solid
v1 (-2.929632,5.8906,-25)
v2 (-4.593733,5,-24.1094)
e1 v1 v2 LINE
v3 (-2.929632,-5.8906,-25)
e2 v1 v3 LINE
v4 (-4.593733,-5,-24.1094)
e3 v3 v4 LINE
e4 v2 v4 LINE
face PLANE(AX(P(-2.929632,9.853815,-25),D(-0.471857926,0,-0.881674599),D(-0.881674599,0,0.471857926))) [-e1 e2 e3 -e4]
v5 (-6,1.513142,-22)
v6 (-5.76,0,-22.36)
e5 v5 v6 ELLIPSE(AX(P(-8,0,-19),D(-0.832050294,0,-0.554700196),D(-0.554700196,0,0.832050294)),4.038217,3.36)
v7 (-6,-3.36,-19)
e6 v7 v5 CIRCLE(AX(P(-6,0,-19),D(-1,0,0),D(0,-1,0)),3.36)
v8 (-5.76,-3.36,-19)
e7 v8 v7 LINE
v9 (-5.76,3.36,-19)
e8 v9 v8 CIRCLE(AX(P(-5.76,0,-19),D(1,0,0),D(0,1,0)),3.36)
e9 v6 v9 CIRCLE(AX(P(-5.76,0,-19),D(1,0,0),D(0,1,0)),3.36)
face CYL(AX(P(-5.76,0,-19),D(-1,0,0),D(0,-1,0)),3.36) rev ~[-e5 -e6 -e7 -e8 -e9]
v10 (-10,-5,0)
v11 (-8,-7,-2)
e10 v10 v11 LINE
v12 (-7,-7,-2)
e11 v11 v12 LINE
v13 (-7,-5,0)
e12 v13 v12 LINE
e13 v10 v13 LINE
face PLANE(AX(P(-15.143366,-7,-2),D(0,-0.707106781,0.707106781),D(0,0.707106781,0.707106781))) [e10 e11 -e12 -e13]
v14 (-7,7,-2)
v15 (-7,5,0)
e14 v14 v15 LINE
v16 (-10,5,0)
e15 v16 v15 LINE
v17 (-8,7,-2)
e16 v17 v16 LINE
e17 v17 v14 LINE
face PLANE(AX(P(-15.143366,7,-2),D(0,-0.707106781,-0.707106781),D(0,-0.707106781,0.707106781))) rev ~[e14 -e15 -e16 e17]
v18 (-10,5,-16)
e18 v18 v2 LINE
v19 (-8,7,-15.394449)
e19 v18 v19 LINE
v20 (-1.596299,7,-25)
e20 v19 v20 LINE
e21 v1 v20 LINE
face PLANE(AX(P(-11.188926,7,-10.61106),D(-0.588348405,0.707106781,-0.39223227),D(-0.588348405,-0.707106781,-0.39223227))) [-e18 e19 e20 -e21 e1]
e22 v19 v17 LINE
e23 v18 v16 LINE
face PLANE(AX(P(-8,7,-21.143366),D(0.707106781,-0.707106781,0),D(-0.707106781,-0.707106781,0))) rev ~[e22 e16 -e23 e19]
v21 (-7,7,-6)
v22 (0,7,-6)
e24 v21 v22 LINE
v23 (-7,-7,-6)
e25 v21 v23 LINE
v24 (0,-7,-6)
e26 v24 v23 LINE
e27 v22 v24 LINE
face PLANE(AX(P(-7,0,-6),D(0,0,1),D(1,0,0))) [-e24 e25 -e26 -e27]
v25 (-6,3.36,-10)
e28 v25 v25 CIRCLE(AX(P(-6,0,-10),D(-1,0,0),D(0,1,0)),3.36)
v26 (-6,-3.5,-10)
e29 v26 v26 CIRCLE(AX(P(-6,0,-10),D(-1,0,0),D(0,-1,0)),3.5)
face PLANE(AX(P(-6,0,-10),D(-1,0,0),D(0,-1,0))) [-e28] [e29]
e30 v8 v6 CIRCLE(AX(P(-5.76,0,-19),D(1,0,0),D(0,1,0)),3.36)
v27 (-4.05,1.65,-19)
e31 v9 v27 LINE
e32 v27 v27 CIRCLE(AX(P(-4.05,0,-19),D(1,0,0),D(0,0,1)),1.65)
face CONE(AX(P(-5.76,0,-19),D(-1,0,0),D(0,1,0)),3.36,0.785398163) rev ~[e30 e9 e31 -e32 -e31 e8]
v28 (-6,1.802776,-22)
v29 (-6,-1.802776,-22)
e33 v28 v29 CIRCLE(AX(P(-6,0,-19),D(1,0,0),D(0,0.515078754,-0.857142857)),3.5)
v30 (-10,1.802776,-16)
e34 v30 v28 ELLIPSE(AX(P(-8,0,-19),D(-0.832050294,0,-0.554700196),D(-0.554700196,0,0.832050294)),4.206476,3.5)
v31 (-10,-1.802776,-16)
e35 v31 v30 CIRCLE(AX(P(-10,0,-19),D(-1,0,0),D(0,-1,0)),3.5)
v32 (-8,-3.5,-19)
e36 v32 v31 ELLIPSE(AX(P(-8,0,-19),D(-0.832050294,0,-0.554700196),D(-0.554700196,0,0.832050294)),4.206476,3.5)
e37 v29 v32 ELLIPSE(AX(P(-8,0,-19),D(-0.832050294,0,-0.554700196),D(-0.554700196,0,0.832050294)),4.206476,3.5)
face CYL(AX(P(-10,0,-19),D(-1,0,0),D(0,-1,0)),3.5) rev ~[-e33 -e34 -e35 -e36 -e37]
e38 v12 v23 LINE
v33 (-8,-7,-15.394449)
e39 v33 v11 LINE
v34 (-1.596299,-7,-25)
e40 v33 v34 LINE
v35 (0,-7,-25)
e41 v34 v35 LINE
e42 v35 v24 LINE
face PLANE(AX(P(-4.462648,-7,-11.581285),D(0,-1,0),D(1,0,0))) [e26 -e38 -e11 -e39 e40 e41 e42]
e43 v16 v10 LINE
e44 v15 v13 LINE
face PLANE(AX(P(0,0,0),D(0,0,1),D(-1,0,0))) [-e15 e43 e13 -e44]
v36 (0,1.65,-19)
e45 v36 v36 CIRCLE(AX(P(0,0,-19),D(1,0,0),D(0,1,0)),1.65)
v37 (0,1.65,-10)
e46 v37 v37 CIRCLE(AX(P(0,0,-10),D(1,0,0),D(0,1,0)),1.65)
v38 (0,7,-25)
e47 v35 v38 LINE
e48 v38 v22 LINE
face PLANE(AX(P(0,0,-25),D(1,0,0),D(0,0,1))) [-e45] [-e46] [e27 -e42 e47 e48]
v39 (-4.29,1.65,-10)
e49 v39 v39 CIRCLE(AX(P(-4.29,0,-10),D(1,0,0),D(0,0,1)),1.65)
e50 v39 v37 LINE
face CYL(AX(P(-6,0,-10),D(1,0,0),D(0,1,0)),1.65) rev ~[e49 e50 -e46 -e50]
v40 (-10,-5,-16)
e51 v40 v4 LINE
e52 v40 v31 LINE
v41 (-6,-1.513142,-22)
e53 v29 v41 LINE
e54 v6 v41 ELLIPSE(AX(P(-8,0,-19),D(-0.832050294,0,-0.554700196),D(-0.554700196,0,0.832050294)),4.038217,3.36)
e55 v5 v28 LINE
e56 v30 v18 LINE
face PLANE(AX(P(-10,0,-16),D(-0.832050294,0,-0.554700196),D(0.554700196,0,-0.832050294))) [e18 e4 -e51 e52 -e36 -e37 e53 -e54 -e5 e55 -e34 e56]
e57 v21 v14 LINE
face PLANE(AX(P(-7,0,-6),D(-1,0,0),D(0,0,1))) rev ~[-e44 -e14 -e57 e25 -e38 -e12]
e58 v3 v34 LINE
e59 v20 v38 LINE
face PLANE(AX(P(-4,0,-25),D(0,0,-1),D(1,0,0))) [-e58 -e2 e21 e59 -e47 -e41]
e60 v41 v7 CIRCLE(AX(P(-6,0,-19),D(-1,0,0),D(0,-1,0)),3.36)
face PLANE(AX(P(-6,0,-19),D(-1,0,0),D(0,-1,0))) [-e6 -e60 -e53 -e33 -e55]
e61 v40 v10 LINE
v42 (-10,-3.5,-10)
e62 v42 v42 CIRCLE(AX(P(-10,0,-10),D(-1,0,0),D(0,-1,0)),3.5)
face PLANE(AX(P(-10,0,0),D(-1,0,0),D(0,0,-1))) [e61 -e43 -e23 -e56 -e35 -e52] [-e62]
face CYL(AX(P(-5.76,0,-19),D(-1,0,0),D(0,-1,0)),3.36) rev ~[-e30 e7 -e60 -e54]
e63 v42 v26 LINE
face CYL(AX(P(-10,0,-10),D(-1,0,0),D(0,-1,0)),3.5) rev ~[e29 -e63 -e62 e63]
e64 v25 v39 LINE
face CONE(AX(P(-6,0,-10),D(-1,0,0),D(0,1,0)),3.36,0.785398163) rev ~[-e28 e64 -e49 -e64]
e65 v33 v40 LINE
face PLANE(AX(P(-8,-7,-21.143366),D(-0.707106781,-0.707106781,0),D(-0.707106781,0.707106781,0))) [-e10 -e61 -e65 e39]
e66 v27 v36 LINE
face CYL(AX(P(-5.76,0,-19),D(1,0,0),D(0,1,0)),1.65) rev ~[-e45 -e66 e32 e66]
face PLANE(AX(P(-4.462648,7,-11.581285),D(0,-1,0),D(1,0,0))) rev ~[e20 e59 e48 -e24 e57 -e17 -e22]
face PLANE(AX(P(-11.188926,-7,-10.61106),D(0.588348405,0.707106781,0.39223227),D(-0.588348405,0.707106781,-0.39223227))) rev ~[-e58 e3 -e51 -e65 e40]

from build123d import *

# Parameters (mm, degrees)
F1_DEPTH       = 7
F2_R           = 3.5
F3_DEPTH       = 4
F4_D           = 3.3
F4_START       = 4
F4_START_2     = 4.24
F4_CSINK_D     = 6.72
F4_CSINK_ANGLE = 90
F5_T1_DEPTH    = 20.2867319519
F5_T3_DEPTH    = 26.2867319519
F5_T5_DEPTH    = 21.1033857783
F5_T7_DEPTH    = 19.707629012
F6_W           = 7
F6_H           = 6
F7_DEPTH       = 7.001
F7_DEPTH_BACK  = 7.001


# Not quite as in the source:
# - a fillet or chamfer that OpenCascade refuses, or shapes differently, is made with other operations: its cross-section is extruded or revolved along the edge and cut away or added


with BuildPart() as f1:
    # F0 (on Front) → F1 (new body, symmetric)
    with BuildSketch(Plane.XZ):
        Polygon((0, -25), (0, 0), (-10, 0), (-10, -16), (-4, -25), align=None)
    extrude(amount=F1_DEPTH, both=True)

    # F2 (on face) → F3 (cut)
    with BuildSketch(Plane(origin=(-10, 0, 0), x_dir=(0, -1, 0), z_dir=(-1, 0, 0))):
        with Locations((0, -10)):
            Circle(F2_R)
        with Locations((0, -19)):
            Circle(F2_R)
    extrude(amount=-F3_DEPTH, mode=Mode.SUBTRACT)

    # F4 (through all)
    # its depths count from where the whole tool has entered the part; down to there all is cleared
    with Locations(Plane(origin=(-10, 0, 0), x_dir=(0, -1, 0), z_dir=(-1, 0, 0))):
        with Locations((0, -19, -F4_START_2), (0, -10, -F4_START)):
            CounterSinkHole(F4_D / 2, F4_CSINK_D / 2, counter_sink_angle=F4_CSINK_ANGLE)

    # F5: chamfer of 2 on 7 edges, made by hand

    # F5_s2 → F5_t1 (cut)
    with BuildSketch(Plane.YZ.offset(-15.1433659759)):
        Polygon((-7, -2), (-5, 0), (-7, 0), align=None)
        Polygon((7, -2), (5, 0), (7, 0), align=None)
    extrude(amount=F5_T1_DEPTH, mode=Mode.SUBTRACT)

    # F5_s4 → F5_t3 (cut)
    with BuildSketch(Plane.XY.offset(-21.1433659759)):
        Polygon((-8, 7), (-10, 5), (-10, 7), align=None)
        Polygon((-8, -7), (-10, -5), (-10, -7), align=None)
    extrude(amount=F5_T3_DEPTH, mode=Mode.SUBTRACT)

    # F5_s6 → F5_t5 (cut)
    with BuildSketch(Plane(origin=(1.4546661916, 0, -2.1819992874), x_dir=(0, 1, 0), z_dir=(0.5547001962, 0, -0.8320502943))):
        Polygon((-7, -15.195706083), (-5, -17.195706083), (-7, -17.195706083), align=None)
        Polygon((7, -15.195706083), (5, -17.195706083), (7, -17.195706083), align=None)
    extrude(amount=F5_T5_DEPTH, mode=Mode.SUBTRACT)

    # F5_s8 → F5_t7 (cut)
    with BuildSketch(Plane.XZ.offset(-9.853814506)):
        Polygon((-2.929632483, -25), (-4.5937330717, -24.1094003925), (-4, -25), align=None)
    extrude(amount=F5_T7_DEPTH, mode=Mode.SUBTRACT)

    # F6 (on Front) → F7 (cut, two sides)
    with BuildSketch(Plane.XZ) as f7_sk:
        with Locations((-3.5, -3)):
            Rectangle(F6_W, F6_H)
    extrude(amount=-F7_DEPTH, mode=Mode.SUBTRACT)
    extrude(f7_sk.sketch, amount=F7_DEPTH_BACK, mode=Mode.SUBTRACT)


solid = f1.part
